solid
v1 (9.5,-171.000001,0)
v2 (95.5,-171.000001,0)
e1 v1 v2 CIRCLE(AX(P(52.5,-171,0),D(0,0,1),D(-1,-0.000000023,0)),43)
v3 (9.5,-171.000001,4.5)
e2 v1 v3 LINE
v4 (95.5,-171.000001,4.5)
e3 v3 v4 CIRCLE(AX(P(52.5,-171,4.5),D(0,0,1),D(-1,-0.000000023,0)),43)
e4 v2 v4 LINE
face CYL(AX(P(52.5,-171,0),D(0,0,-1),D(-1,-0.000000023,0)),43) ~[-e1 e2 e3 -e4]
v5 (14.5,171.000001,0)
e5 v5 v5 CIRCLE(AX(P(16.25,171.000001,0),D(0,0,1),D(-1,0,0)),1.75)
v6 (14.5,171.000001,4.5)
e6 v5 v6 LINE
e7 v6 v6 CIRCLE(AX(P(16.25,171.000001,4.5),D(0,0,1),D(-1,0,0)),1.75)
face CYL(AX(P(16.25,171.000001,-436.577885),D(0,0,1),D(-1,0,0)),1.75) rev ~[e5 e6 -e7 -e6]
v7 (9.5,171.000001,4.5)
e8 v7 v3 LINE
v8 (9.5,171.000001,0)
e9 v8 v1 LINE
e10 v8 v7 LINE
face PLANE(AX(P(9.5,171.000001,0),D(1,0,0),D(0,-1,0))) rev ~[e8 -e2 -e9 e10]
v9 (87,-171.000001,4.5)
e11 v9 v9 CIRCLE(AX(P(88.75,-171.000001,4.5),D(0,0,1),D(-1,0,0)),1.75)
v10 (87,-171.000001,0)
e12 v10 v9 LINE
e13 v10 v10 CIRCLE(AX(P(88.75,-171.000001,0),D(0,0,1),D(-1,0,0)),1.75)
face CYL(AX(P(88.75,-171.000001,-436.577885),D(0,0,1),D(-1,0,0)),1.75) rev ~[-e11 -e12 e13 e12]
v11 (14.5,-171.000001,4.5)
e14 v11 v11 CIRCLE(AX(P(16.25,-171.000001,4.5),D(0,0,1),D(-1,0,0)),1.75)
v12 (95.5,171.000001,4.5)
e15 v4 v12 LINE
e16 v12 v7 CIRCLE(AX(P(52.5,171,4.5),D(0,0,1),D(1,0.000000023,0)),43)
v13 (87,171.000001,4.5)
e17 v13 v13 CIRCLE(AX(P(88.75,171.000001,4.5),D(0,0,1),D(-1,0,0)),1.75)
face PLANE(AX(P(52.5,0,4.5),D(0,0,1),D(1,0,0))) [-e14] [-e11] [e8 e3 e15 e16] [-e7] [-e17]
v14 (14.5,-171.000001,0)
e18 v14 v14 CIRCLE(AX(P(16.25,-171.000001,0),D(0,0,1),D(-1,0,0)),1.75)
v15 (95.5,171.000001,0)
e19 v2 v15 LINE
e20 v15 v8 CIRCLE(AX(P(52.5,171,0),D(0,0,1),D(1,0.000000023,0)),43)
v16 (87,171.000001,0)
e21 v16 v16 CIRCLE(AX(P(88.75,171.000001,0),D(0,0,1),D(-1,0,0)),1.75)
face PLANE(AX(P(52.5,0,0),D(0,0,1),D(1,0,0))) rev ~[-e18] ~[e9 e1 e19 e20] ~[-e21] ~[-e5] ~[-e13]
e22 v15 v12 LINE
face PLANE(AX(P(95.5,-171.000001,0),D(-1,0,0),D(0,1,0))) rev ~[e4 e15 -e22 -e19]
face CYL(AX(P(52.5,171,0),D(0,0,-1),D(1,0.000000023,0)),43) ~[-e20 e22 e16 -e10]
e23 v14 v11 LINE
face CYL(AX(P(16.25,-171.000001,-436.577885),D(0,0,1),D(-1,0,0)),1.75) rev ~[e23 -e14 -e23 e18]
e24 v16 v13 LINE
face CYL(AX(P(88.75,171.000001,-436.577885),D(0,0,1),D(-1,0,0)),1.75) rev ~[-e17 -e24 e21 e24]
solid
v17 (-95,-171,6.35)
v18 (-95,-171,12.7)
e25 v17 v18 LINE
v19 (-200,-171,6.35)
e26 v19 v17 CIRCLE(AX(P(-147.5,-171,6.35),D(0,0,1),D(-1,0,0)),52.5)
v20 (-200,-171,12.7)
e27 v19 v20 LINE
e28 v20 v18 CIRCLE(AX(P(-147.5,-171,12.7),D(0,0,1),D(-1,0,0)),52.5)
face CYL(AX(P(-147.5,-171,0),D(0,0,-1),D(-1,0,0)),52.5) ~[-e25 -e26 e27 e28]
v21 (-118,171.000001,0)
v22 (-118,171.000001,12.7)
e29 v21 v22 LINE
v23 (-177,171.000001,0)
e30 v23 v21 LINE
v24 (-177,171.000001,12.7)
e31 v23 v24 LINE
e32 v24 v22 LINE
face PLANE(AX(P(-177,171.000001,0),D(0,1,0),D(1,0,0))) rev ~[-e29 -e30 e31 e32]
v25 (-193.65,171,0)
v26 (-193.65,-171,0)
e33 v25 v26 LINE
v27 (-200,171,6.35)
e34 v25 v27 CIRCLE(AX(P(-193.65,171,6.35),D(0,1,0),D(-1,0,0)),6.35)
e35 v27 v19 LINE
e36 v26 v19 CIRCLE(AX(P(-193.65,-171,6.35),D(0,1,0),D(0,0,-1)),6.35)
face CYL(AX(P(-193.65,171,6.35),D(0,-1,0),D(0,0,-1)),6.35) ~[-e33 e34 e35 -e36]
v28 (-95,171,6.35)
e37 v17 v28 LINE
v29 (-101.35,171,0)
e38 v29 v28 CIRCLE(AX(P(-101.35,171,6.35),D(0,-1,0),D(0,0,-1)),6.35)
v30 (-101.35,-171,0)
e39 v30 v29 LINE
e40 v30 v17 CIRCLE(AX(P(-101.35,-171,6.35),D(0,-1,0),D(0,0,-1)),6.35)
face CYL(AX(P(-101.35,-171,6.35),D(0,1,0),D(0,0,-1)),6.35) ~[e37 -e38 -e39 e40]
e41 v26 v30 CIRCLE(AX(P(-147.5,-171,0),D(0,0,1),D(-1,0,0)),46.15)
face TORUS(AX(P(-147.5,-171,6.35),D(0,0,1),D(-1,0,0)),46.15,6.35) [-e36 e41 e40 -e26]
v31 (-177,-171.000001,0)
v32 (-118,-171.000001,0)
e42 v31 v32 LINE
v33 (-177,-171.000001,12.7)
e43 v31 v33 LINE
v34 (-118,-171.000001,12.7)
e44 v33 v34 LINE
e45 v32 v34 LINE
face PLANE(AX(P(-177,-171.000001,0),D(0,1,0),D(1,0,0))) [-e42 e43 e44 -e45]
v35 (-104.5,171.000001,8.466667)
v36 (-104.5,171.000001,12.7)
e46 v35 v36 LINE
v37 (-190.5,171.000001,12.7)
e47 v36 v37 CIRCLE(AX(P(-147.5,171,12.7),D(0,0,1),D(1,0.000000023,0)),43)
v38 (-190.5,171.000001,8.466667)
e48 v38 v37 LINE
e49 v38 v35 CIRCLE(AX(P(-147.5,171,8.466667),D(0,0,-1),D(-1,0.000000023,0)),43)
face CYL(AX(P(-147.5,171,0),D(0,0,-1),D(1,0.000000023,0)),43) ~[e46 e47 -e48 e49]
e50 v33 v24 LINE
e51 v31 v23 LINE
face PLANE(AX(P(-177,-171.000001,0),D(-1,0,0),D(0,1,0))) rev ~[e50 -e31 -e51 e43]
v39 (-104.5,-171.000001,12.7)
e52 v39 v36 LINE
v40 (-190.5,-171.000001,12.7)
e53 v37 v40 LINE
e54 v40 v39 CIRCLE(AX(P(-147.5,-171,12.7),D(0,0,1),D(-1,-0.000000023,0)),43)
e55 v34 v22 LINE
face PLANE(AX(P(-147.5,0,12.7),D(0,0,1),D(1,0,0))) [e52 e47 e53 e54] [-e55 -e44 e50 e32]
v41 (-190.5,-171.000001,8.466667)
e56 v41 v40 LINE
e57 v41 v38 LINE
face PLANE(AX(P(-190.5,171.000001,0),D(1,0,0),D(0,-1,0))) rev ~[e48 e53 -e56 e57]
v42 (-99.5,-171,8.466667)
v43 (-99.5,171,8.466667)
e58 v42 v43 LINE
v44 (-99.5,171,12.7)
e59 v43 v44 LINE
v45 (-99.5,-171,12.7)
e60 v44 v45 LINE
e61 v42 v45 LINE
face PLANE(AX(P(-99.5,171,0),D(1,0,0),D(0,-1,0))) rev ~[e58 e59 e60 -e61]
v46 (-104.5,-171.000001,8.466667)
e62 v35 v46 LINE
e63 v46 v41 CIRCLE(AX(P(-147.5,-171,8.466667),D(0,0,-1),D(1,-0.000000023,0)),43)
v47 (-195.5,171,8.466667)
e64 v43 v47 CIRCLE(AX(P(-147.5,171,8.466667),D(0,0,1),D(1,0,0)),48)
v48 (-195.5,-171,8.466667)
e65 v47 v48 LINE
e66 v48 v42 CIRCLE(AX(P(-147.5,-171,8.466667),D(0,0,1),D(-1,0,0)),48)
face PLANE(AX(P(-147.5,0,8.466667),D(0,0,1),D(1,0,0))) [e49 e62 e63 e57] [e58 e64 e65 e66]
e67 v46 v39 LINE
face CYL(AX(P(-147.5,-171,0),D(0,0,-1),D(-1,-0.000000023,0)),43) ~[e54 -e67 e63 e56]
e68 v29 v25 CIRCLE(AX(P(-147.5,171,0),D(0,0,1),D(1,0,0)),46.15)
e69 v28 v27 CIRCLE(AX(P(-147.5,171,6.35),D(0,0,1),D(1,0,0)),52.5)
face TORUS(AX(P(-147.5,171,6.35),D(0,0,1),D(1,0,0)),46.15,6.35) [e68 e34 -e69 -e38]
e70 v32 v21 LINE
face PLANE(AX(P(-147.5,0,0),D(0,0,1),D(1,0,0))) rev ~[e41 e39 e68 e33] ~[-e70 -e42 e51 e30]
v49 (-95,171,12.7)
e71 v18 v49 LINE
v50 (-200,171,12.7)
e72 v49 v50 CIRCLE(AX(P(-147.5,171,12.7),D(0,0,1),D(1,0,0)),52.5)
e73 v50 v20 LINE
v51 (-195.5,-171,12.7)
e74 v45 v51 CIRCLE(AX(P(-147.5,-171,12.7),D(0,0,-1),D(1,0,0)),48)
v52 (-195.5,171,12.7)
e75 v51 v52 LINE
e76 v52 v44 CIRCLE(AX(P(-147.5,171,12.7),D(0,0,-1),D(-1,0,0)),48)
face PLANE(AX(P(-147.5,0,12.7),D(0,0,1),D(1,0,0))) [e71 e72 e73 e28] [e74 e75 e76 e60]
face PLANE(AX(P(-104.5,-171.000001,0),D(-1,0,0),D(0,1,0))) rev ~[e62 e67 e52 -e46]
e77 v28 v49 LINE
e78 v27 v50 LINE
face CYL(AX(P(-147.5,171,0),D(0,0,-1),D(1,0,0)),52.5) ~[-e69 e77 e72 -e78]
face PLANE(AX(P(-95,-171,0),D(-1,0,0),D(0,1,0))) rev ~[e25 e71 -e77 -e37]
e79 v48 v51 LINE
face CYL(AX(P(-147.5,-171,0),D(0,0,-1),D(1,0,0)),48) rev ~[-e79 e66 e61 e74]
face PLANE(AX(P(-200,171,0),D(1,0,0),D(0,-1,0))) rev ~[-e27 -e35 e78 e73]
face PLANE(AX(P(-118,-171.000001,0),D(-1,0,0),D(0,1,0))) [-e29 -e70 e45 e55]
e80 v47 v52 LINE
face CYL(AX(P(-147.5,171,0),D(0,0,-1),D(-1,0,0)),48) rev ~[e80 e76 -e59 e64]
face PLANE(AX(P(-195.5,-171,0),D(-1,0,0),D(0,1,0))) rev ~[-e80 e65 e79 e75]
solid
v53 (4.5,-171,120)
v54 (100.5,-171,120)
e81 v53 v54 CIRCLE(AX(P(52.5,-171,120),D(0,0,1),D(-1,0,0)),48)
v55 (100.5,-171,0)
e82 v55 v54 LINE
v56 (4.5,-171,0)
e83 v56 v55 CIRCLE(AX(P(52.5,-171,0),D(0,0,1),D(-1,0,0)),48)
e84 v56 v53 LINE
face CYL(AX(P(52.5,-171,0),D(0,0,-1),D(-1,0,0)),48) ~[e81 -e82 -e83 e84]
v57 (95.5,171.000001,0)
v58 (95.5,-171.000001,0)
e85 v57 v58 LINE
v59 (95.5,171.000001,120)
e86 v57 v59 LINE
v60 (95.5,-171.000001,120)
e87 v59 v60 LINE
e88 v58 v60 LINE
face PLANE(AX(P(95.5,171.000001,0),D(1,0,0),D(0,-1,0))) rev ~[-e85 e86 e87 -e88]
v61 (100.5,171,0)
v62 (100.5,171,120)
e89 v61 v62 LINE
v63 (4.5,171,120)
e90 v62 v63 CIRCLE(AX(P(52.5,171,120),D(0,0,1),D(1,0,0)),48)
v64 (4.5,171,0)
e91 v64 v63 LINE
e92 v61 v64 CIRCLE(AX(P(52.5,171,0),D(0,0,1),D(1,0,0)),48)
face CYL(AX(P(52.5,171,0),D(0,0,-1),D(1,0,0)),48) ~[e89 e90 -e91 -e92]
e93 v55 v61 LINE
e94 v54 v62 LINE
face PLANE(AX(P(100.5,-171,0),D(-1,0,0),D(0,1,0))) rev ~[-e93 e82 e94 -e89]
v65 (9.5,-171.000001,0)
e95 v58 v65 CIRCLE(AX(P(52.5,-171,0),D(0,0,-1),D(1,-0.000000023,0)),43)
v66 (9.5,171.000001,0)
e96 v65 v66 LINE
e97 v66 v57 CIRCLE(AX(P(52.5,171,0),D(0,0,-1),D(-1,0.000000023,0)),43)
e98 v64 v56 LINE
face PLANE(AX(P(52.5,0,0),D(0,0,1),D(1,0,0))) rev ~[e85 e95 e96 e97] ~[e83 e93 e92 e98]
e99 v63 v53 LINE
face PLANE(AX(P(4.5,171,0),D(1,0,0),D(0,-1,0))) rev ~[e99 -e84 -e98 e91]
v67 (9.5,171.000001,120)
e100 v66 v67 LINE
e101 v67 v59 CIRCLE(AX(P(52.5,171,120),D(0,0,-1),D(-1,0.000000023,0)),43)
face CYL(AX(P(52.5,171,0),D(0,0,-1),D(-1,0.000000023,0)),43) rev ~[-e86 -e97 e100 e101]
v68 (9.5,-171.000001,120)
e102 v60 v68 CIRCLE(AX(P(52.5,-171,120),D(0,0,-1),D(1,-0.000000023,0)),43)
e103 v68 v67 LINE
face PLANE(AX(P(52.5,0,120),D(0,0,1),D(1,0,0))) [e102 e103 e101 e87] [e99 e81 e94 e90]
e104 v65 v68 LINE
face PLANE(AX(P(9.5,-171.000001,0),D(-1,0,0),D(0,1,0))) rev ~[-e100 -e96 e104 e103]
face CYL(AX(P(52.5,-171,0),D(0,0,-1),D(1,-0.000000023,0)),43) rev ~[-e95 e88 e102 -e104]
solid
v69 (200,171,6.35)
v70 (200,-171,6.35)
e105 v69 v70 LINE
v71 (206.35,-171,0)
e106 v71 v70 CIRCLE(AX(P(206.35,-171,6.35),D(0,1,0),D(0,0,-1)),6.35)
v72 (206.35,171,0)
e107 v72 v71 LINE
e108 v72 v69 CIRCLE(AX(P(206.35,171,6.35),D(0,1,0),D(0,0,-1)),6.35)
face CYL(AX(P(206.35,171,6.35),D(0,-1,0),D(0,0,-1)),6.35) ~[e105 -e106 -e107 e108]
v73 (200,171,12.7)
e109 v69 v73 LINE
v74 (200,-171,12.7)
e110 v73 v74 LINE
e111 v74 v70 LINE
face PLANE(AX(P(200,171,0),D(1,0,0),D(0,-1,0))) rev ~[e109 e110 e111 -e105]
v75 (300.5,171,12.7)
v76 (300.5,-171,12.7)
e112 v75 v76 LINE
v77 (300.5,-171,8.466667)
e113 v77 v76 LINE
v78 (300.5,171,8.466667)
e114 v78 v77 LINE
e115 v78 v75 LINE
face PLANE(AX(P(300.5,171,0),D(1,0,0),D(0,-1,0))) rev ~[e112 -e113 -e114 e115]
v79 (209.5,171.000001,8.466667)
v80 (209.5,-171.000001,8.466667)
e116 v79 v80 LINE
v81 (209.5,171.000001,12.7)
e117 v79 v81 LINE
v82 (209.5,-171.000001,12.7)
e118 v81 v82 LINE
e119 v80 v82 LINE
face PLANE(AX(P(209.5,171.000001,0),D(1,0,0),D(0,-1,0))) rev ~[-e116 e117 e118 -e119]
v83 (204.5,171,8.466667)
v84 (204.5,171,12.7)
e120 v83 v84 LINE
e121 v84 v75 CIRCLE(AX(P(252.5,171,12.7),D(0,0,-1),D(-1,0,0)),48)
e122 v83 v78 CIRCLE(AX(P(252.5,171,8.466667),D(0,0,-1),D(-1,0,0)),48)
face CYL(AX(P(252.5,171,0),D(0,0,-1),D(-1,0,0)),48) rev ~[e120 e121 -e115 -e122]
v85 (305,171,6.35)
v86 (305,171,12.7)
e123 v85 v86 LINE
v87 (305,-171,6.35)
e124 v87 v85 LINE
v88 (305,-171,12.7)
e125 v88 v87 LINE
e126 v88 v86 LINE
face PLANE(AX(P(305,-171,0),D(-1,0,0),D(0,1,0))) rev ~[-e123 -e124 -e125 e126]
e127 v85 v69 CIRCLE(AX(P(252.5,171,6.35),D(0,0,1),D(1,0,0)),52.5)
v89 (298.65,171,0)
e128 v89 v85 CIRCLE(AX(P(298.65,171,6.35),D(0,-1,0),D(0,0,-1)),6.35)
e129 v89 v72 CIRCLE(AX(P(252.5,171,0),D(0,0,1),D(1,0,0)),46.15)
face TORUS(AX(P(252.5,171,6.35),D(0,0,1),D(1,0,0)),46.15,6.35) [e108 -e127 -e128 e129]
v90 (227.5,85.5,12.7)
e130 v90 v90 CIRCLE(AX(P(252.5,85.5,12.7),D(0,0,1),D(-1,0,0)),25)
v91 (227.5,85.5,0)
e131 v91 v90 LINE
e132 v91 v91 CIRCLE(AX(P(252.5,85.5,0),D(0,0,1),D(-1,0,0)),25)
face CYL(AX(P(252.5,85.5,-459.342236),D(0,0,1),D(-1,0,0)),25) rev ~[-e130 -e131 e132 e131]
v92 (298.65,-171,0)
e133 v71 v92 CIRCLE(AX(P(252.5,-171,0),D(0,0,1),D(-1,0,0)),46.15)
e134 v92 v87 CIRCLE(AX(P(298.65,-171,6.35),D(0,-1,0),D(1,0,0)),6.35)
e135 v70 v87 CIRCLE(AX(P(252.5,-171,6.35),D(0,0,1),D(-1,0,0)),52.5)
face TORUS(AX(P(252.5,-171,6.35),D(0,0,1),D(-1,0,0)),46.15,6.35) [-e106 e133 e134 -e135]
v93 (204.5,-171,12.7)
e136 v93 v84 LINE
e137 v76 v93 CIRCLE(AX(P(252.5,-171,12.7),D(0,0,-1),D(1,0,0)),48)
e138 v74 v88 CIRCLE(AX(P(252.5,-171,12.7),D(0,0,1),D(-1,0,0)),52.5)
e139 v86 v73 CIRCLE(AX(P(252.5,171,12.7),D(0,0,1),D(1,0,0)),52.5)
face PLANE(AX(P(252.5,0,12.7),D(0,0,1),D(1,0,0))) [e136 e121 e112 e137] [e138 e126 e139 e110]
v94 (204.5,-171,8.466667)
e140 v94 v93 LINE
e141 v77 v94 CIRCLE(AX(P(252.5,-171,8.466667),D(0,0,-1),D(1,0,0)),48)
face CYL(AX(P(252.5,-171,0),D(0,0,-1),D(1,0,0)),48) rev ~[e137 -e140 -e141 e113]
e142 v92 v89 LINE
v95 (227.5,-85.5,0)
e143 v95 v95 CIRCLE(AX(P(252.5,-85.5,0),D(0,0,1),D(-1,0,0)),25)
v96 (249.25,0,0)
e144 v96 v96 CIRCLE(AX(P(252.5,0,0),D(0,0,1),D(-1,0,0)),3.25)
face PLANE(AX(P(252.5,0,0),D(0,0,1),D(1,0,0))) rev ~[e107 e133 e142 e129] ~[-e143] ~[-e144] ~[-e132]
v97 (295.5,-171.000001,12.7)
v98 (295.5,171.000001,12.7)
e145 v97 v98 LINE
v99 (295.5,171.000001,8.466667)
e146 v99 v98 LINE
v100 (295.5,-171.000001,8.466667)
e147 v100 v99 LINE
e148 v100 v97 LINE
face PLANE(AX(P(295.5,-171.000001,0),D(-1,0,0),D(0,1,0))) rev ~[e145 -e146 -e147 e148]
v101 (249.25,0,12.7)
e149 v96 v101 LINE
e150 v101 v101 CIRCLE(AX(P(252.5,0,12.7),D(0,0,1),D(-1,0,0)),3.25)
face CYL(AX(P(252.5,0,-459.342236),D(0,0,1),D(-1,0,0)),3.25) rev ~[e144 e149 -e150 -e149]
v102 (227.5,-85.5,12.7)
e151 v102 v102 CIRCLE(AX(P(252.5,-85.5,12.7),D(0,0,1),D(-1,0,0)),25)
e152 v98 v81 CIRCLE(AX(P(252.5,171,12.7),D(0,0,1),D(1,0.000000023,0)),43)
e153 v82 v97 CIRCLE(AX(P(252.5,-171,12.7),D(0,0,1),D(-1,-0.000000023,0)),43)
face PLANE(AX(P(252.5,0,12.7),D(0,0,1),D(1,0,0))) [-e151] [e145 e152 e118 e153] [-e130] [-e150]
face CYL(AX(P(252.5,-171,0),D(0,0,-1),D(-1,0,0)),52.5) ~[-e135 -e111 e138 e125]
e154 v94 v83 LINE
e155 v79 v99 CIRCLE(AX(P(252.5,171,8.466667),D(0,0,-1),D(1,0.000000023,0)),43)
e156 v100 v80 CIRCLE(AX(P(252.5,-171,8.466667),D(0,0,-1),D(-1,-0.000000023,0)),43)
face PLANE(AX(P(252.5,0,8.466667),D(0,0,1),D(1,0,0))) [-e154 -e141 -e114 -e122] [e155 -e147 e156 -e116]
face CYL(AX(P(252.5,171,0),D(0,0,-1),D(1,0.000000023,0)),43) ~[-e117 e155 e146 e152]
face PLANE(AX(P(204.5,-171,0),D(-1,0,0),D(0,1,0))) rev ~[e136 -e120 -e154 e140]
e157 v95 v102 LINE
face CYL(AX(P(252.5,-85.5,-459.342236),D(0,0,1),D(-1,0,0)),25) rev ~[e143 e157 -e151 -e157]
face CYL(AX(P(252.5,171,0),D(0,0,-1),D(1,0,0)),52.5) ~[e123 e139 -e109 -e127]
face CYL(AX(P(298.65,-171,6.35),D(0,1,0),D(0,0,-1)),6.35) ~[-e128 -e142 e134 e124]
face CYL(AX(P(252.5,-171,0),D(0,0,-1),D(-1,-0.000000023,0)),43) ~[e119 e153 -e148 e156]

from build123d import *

# Parameters (mm, degrees)
F4_DEPTH  = 12.7
F3_W      = 59
F3_H      = 342.0000019477
F5_DEPTH  = 8.4666666667
F6_D      = 50
F7_D      = 6.5
F9_DEPTH  = 12.7
F10_DEPTH = 8.4666666667
F12_DEPTH = 120
F13_DEPTH = 4.5
F14_D     = 3.5
F15_R     = 6.35
F15_2_R   = 6.35


# Not quite as in the source:
# - a feature names something its author has since deleted; it is built from what else it names


with BuildPart() as f4:
    # F3 (on Top) → F4 (new body)
    with BuildSketch(Plane.XY):
        with BuildLine():
            Line((105, -171), (105, 0))
            Line((105, 0), (105, 171))
            ThreePointArc((105, 171), (52.5, 223.5), (0, 171))
            Line((0, 171), (0, 0))
            Line((0, 0), (0, -171))
            ThreePointArc((0, -171), (52.5, -223.5), (105, -171))
        make_face()
        with BuildLine():
            Line((100.5, 171), (100.5, 0))
            Line((100.5, 0), (100.5, -171))
            ThreePointArc((100.5, -171), (52.5, -219), (4.5, -171))
            Line((4.5, -171), (4.5, 0))
            Line((4.5, 0), (4.5, 171))
            ThreePointArc((4.5, 171), (52.5, 219), (100.5, 171))
        make_face(mode=Mode.SUBTRACT)
    extrude(amount=F4_DEPTH)



with BuildPart() as f4b:
    # F3 (on Top) → F4, piece 2 (new body)
    with BuildSketch(Plane.XY):
        with BuildLine():
            Line((9.5, 171.0000009738), (9.5, 0))
            Line((9.5, 0), (9.5, -171.0000009738))
            ThreePointArc((9.5, -171.0000009738), (52.5, -214), (95.5, -171.0000009738))
            Line((95.5, -171.0000009738), (95.5, 0))
            Line((95.5, 0), (95.5, 171.0000009738))
            ThreePointArc((95.5, 171.0000009738), (52.5, 214), (9.5, 171.0000009738))
        make_face()
        with Locations((52.5, 0)):
            Rectangle(F3_W, F3_H, mode=Mode.SUBTRACT)
        with Locations((52.5, 0)):
            Rectangle(F3_W, F3_H)
    extrude(amount=F4_DEPTH)


with BuildPart() as f4_1:
    add(f4.part)

    add(f4b.part)  # F5 merges F4b
    # F3 (on Top) → F5 (join)
    with BuildSketch(Plane.XY):
        with BuildLine():
            Line((105, -171), (105, 0))
            Line((105, 0), (105, 171))
            ThreePointArc((105, 171), (52.5, 223.5), (0, 171))
            Line((0, 171), (0, 0))
            Line((0, 0), (0, -171))
            ThreePointArc((0, -171), (52.5, -223.5), (105, -171))
        make_face()
        with BuildLine():
            Line((100.5, 171), (100.5, 0))
            Line((100.5, 0), (100.5, -171))
            ThreePointArc((100.5, -171), (52.5, -219), (4.5, -171))
            Line((4.5, -171), (4.5, 0))
            Line((4.5, 0), (4.5, 171))
            ThreePointArc((4.5, 171), (52.5, 219), (100.5, 171))
        make_face(mode=Mode.SUBTRACT)
        with BuildLine():
            Line((100.5, -171), (100.5, 0))
            Line((100.5, 0), (100.5, 171))
            ThreePointArc((100.5, 171), (52.5, 219), (4.5, 171))
            Line((4.5, 171), (4.5, 0))
            Line((4.5, 0), (4.5, -171))
            ThreePointArc((4.5, -171), (52.5, -219), (100.5, -171))
        make_face()
        with BuildLine():
            Line((9.5, -171.0000009738), (9.5, 0))
            Line((9.5, 0), (9.5, 171.0000009738))
            ThreePointArc((9.5, 171.0000009738), (52.5, 214), (95.5, 171.0000009738))
            Line((95.5, 171.0000009738), (95.5, 0))
            Line((95.5, 0), (95.5, -171.0000009738))
            ThreePointArc((95.5, -171.0000009738), (52.5, -214), (9.5, -171.0000009738))
        make_face(mode=Mode.SUBTRACT)
        with BuildLine():
            Line((9.5, 171.0000009738), (9.5, 0))
            Line((9.5, 0), (9.5, -171.0000009738))
            ThreePointArc((9.5, -171.0000009738), (52.5, -214), (95.5, -171.0000009738))
            Line((95.5, -171.0000009738), (95.5, 0))
            Line((95.5, 0), (95.5, 171.0000009738))
            ThreePointArc((95.5, 171.0000009738), (52.5, 214), (9.5, 171.0000009738))
        make_face()
        with Locations((52.5, 0)):
            Rectangle(F3_W, F3_H, mode=Mode.SUBTRACT)
    extrude(amount=F5_DEPTH)

    # F6 (through all)
    with Locations(Plane(origin=(0, 0, 0), x_dir=(1, 0, 0), z_dir=(0, 0, -1))):
        with Locations((52.5, 85.5), (52.5, -85.5)):
            Hole(F6_D / 2)

    # F7 (through all)
    with Locations(Plane(origin=(0, 0, 0), x_dir=(1, 0, 0), z_dir=(0, 0, -1))):
        with Locations((52.5, 0)):
            Hole(F7_D / 2)


with BuildPart() as f4_2:
    # F8: moved
    add(f4_1.part.moved(Location((200, 0, 0))))

    # F15
    f15_edges = [f4_2.edges().sort_by_distance(p)[0] for p in [
        (200, 0, 0),
    ]]
    fillet(f15_edges, radius=F15_R)


with BuildPart() as f9:
    # F3 (on Top) → F9 (new body)
    with BuildSketch(Plane.XY):
        with BuildLine():
            Line((105, -171), (105, 0))
            Line((105, 0), (105, 171))
            ThreePointArc((105, 171), (52.5, 223.5), (0, 171))
            Line((0, 171), (0, 0))
            Line((0, 0), (0, -171))
            ThreePointArc((0, -171), (52.5, -223.5), (105, -171))
        make_face()
        with BuildLine():
            Line((100.5, 171), (100.5, 0))
            Line((100.5, 0), (100.5, -171))
            ThreePointArc((100.5, -171), (52.5, -219), (4.5, -171))
            Line((4.5, -171), (4.5, 0))
            Line((4.5, 0), (4.5, 171))
            ThreePointArc((4.5, 171), (52.5, 219), (100.5, 171))
        make_face(mode=Mode.SUBTRACT)
    extrude(amount=F9_DEPTH)



with BuildPart() as f9b:
    # F3 (on Top) → F9, piece 2 (new body)
    with BuildSketch(Plane.XY):
        with BuildLine():
            Line((9.5, 171.0000009738), (9.5, 0))
            Line((9.5, 0), (9.5, -171.0000009738))
            ThreePointArc((9.5, -171.0000009738), (52.5, -214), (95.5, -171.0000009738))
            Line((95.5, -171.0000009738), (95.5, 0))
            Line((95.5, 0), (95.5, 171.0000009738))
            ThreePointArc((95.5, 171.0000009738), (52.5, 214), (9.5, 171.0000009738))
        make_face()
        with Locations((52.5, 0)):
            Rectangle(F3_W, F3_H, mode=Mode.SUBTRACT)
    extrude(amount=F9_DEPTH)


with BuildPart() as f9_1:
    add(f9.part)

    add(f9b.part)  # F10 merges F9b
    # F3 (on Top) → F10 (join)
    with BuildSketch(Plane.XY):
        with BuildLine():
            Line((100.5, -171), (100.5, 0))
            Line((100.5, 0), (100.5, 171))
            ThreePointArc((100.5, 171), (52.5, 219), (4.5, 171))
            Line((4.5, 171), (4.5, 0))
            Line((4.5, 0), (4.5, -171))
            ThreePointArc((4.5, -171), (52.5, -219), (100.5, -171))
        make_face()
        with BuildLine():
            Line((9.5, -171.0000009738), (9.5, 0))
            Line((9.5, 0), (9.5, 171.0000009738))
            ThreePointArc((9.5, 171.0000009738), (52.5, 214), (95.5, 171.0000009738))
            Line((95.5, 171.0000009738), (95.5, 0))
            Line((95.5, 0), (95.5, -171.0000009738))
            ThreePointArc((95.5, -171.0000009738), (52.5, -214), (9.5, -171.0000009738))
        make_face(mode=Mode.SUBTRACT)
    extrude(amount=F10_DEPTH)


with BuildPart() as f9_2:
    # F11: moved
    add(f9_1.part.moved(Location((-200, 0, 0))))

    # F15#2
    f15_2_edges = [f9_2.edges().sort_by_distance(p)[0] for p in [
        (-95, 0, 0),
    ]]
    fillet(f15_2_edges, radius=F15_2_R)


with BuildPart() as f12:
    # F3 (on Top) → F12 (new body)
    with BuildSketch(Plane.XY):
        with BuildLine():
            Line((100.5, -171), (100.5, 0))
            Line((100.5, 0), (100.5, 171))
            ThreePointArc((100.5, 171), (52.5, 219), (4.5, 171))
            Line((4.5, 171), (4.5, 0))
            Line((4.5, 0), (4.5, -171))
            ThreePointArc((4.5, -171), (52.5, -219), (100.5, -171))
        make_face()
        with BuildLine():
            Line((9.5, -171.0000009738), (9.5, 0))
            Line((9.5, 0), (9.5, 171.0000009738))
            ThreePointArc((9.5, 171.0000009738), (52.5, 214), (95.5, 171.0000009738))
            Line((95.5, 171.0000009738), (95.5, 0))
            Line((95.5, 0), (95.5, -171.0000009738))
            ThreePointArc((95.5, -171.0000009738), (52.5, -214), (9.5, -171.0000009738))
        make_face(mode=Mode.SUBTRACT)
    extrude(amount=F12_DEPTH)


with BuildPart() as f13:
    # F3 (on Top) → F13 (new body)
    with BuildSketch(Plane.XY):
        with BuildLine():
            Line((9.5, 171.0000009738), (9.5, 0))
            Line((9.5, 0), (9.5, -171.0000009738))
            ThreePointArc((9.5, -171.0000009738), (52.5, -214), (95.5, -171.0000009738))
            Line((95.5, -171.0000009738), (95.5, 0))
            Line((95.5, 0), (95.5, 171.0000009738))
            ThreePointArc((95.5, 171.0000009738), (52.5, 214), (9.5, 171.0000009738))
        make_face()
        with Locations((52.5, 0)):
            Rectangle(F3_W, F3_H, mode=Mode.SUBTRACT)
        with Locations((52.5, 0)):
            Rectangle(F3_W, F3_H)
    extrude(amount=F13_DEPTH)

    # F14 (through all)
    with Locations(Plane(origin=(0, 0, 0), x_dir=(1, 0, 0), z_dir=(0, 0, -1))):
        with Locations((16.25, 171.0000009738), (88.75, 171.0000009738), (16.25, -171.0000009738), (88.75, -171.0000009738)):
            Hole(F14_D / 2)


solid = Compound([f4_2.part, f9_2.part, f12.part, f13.part])
